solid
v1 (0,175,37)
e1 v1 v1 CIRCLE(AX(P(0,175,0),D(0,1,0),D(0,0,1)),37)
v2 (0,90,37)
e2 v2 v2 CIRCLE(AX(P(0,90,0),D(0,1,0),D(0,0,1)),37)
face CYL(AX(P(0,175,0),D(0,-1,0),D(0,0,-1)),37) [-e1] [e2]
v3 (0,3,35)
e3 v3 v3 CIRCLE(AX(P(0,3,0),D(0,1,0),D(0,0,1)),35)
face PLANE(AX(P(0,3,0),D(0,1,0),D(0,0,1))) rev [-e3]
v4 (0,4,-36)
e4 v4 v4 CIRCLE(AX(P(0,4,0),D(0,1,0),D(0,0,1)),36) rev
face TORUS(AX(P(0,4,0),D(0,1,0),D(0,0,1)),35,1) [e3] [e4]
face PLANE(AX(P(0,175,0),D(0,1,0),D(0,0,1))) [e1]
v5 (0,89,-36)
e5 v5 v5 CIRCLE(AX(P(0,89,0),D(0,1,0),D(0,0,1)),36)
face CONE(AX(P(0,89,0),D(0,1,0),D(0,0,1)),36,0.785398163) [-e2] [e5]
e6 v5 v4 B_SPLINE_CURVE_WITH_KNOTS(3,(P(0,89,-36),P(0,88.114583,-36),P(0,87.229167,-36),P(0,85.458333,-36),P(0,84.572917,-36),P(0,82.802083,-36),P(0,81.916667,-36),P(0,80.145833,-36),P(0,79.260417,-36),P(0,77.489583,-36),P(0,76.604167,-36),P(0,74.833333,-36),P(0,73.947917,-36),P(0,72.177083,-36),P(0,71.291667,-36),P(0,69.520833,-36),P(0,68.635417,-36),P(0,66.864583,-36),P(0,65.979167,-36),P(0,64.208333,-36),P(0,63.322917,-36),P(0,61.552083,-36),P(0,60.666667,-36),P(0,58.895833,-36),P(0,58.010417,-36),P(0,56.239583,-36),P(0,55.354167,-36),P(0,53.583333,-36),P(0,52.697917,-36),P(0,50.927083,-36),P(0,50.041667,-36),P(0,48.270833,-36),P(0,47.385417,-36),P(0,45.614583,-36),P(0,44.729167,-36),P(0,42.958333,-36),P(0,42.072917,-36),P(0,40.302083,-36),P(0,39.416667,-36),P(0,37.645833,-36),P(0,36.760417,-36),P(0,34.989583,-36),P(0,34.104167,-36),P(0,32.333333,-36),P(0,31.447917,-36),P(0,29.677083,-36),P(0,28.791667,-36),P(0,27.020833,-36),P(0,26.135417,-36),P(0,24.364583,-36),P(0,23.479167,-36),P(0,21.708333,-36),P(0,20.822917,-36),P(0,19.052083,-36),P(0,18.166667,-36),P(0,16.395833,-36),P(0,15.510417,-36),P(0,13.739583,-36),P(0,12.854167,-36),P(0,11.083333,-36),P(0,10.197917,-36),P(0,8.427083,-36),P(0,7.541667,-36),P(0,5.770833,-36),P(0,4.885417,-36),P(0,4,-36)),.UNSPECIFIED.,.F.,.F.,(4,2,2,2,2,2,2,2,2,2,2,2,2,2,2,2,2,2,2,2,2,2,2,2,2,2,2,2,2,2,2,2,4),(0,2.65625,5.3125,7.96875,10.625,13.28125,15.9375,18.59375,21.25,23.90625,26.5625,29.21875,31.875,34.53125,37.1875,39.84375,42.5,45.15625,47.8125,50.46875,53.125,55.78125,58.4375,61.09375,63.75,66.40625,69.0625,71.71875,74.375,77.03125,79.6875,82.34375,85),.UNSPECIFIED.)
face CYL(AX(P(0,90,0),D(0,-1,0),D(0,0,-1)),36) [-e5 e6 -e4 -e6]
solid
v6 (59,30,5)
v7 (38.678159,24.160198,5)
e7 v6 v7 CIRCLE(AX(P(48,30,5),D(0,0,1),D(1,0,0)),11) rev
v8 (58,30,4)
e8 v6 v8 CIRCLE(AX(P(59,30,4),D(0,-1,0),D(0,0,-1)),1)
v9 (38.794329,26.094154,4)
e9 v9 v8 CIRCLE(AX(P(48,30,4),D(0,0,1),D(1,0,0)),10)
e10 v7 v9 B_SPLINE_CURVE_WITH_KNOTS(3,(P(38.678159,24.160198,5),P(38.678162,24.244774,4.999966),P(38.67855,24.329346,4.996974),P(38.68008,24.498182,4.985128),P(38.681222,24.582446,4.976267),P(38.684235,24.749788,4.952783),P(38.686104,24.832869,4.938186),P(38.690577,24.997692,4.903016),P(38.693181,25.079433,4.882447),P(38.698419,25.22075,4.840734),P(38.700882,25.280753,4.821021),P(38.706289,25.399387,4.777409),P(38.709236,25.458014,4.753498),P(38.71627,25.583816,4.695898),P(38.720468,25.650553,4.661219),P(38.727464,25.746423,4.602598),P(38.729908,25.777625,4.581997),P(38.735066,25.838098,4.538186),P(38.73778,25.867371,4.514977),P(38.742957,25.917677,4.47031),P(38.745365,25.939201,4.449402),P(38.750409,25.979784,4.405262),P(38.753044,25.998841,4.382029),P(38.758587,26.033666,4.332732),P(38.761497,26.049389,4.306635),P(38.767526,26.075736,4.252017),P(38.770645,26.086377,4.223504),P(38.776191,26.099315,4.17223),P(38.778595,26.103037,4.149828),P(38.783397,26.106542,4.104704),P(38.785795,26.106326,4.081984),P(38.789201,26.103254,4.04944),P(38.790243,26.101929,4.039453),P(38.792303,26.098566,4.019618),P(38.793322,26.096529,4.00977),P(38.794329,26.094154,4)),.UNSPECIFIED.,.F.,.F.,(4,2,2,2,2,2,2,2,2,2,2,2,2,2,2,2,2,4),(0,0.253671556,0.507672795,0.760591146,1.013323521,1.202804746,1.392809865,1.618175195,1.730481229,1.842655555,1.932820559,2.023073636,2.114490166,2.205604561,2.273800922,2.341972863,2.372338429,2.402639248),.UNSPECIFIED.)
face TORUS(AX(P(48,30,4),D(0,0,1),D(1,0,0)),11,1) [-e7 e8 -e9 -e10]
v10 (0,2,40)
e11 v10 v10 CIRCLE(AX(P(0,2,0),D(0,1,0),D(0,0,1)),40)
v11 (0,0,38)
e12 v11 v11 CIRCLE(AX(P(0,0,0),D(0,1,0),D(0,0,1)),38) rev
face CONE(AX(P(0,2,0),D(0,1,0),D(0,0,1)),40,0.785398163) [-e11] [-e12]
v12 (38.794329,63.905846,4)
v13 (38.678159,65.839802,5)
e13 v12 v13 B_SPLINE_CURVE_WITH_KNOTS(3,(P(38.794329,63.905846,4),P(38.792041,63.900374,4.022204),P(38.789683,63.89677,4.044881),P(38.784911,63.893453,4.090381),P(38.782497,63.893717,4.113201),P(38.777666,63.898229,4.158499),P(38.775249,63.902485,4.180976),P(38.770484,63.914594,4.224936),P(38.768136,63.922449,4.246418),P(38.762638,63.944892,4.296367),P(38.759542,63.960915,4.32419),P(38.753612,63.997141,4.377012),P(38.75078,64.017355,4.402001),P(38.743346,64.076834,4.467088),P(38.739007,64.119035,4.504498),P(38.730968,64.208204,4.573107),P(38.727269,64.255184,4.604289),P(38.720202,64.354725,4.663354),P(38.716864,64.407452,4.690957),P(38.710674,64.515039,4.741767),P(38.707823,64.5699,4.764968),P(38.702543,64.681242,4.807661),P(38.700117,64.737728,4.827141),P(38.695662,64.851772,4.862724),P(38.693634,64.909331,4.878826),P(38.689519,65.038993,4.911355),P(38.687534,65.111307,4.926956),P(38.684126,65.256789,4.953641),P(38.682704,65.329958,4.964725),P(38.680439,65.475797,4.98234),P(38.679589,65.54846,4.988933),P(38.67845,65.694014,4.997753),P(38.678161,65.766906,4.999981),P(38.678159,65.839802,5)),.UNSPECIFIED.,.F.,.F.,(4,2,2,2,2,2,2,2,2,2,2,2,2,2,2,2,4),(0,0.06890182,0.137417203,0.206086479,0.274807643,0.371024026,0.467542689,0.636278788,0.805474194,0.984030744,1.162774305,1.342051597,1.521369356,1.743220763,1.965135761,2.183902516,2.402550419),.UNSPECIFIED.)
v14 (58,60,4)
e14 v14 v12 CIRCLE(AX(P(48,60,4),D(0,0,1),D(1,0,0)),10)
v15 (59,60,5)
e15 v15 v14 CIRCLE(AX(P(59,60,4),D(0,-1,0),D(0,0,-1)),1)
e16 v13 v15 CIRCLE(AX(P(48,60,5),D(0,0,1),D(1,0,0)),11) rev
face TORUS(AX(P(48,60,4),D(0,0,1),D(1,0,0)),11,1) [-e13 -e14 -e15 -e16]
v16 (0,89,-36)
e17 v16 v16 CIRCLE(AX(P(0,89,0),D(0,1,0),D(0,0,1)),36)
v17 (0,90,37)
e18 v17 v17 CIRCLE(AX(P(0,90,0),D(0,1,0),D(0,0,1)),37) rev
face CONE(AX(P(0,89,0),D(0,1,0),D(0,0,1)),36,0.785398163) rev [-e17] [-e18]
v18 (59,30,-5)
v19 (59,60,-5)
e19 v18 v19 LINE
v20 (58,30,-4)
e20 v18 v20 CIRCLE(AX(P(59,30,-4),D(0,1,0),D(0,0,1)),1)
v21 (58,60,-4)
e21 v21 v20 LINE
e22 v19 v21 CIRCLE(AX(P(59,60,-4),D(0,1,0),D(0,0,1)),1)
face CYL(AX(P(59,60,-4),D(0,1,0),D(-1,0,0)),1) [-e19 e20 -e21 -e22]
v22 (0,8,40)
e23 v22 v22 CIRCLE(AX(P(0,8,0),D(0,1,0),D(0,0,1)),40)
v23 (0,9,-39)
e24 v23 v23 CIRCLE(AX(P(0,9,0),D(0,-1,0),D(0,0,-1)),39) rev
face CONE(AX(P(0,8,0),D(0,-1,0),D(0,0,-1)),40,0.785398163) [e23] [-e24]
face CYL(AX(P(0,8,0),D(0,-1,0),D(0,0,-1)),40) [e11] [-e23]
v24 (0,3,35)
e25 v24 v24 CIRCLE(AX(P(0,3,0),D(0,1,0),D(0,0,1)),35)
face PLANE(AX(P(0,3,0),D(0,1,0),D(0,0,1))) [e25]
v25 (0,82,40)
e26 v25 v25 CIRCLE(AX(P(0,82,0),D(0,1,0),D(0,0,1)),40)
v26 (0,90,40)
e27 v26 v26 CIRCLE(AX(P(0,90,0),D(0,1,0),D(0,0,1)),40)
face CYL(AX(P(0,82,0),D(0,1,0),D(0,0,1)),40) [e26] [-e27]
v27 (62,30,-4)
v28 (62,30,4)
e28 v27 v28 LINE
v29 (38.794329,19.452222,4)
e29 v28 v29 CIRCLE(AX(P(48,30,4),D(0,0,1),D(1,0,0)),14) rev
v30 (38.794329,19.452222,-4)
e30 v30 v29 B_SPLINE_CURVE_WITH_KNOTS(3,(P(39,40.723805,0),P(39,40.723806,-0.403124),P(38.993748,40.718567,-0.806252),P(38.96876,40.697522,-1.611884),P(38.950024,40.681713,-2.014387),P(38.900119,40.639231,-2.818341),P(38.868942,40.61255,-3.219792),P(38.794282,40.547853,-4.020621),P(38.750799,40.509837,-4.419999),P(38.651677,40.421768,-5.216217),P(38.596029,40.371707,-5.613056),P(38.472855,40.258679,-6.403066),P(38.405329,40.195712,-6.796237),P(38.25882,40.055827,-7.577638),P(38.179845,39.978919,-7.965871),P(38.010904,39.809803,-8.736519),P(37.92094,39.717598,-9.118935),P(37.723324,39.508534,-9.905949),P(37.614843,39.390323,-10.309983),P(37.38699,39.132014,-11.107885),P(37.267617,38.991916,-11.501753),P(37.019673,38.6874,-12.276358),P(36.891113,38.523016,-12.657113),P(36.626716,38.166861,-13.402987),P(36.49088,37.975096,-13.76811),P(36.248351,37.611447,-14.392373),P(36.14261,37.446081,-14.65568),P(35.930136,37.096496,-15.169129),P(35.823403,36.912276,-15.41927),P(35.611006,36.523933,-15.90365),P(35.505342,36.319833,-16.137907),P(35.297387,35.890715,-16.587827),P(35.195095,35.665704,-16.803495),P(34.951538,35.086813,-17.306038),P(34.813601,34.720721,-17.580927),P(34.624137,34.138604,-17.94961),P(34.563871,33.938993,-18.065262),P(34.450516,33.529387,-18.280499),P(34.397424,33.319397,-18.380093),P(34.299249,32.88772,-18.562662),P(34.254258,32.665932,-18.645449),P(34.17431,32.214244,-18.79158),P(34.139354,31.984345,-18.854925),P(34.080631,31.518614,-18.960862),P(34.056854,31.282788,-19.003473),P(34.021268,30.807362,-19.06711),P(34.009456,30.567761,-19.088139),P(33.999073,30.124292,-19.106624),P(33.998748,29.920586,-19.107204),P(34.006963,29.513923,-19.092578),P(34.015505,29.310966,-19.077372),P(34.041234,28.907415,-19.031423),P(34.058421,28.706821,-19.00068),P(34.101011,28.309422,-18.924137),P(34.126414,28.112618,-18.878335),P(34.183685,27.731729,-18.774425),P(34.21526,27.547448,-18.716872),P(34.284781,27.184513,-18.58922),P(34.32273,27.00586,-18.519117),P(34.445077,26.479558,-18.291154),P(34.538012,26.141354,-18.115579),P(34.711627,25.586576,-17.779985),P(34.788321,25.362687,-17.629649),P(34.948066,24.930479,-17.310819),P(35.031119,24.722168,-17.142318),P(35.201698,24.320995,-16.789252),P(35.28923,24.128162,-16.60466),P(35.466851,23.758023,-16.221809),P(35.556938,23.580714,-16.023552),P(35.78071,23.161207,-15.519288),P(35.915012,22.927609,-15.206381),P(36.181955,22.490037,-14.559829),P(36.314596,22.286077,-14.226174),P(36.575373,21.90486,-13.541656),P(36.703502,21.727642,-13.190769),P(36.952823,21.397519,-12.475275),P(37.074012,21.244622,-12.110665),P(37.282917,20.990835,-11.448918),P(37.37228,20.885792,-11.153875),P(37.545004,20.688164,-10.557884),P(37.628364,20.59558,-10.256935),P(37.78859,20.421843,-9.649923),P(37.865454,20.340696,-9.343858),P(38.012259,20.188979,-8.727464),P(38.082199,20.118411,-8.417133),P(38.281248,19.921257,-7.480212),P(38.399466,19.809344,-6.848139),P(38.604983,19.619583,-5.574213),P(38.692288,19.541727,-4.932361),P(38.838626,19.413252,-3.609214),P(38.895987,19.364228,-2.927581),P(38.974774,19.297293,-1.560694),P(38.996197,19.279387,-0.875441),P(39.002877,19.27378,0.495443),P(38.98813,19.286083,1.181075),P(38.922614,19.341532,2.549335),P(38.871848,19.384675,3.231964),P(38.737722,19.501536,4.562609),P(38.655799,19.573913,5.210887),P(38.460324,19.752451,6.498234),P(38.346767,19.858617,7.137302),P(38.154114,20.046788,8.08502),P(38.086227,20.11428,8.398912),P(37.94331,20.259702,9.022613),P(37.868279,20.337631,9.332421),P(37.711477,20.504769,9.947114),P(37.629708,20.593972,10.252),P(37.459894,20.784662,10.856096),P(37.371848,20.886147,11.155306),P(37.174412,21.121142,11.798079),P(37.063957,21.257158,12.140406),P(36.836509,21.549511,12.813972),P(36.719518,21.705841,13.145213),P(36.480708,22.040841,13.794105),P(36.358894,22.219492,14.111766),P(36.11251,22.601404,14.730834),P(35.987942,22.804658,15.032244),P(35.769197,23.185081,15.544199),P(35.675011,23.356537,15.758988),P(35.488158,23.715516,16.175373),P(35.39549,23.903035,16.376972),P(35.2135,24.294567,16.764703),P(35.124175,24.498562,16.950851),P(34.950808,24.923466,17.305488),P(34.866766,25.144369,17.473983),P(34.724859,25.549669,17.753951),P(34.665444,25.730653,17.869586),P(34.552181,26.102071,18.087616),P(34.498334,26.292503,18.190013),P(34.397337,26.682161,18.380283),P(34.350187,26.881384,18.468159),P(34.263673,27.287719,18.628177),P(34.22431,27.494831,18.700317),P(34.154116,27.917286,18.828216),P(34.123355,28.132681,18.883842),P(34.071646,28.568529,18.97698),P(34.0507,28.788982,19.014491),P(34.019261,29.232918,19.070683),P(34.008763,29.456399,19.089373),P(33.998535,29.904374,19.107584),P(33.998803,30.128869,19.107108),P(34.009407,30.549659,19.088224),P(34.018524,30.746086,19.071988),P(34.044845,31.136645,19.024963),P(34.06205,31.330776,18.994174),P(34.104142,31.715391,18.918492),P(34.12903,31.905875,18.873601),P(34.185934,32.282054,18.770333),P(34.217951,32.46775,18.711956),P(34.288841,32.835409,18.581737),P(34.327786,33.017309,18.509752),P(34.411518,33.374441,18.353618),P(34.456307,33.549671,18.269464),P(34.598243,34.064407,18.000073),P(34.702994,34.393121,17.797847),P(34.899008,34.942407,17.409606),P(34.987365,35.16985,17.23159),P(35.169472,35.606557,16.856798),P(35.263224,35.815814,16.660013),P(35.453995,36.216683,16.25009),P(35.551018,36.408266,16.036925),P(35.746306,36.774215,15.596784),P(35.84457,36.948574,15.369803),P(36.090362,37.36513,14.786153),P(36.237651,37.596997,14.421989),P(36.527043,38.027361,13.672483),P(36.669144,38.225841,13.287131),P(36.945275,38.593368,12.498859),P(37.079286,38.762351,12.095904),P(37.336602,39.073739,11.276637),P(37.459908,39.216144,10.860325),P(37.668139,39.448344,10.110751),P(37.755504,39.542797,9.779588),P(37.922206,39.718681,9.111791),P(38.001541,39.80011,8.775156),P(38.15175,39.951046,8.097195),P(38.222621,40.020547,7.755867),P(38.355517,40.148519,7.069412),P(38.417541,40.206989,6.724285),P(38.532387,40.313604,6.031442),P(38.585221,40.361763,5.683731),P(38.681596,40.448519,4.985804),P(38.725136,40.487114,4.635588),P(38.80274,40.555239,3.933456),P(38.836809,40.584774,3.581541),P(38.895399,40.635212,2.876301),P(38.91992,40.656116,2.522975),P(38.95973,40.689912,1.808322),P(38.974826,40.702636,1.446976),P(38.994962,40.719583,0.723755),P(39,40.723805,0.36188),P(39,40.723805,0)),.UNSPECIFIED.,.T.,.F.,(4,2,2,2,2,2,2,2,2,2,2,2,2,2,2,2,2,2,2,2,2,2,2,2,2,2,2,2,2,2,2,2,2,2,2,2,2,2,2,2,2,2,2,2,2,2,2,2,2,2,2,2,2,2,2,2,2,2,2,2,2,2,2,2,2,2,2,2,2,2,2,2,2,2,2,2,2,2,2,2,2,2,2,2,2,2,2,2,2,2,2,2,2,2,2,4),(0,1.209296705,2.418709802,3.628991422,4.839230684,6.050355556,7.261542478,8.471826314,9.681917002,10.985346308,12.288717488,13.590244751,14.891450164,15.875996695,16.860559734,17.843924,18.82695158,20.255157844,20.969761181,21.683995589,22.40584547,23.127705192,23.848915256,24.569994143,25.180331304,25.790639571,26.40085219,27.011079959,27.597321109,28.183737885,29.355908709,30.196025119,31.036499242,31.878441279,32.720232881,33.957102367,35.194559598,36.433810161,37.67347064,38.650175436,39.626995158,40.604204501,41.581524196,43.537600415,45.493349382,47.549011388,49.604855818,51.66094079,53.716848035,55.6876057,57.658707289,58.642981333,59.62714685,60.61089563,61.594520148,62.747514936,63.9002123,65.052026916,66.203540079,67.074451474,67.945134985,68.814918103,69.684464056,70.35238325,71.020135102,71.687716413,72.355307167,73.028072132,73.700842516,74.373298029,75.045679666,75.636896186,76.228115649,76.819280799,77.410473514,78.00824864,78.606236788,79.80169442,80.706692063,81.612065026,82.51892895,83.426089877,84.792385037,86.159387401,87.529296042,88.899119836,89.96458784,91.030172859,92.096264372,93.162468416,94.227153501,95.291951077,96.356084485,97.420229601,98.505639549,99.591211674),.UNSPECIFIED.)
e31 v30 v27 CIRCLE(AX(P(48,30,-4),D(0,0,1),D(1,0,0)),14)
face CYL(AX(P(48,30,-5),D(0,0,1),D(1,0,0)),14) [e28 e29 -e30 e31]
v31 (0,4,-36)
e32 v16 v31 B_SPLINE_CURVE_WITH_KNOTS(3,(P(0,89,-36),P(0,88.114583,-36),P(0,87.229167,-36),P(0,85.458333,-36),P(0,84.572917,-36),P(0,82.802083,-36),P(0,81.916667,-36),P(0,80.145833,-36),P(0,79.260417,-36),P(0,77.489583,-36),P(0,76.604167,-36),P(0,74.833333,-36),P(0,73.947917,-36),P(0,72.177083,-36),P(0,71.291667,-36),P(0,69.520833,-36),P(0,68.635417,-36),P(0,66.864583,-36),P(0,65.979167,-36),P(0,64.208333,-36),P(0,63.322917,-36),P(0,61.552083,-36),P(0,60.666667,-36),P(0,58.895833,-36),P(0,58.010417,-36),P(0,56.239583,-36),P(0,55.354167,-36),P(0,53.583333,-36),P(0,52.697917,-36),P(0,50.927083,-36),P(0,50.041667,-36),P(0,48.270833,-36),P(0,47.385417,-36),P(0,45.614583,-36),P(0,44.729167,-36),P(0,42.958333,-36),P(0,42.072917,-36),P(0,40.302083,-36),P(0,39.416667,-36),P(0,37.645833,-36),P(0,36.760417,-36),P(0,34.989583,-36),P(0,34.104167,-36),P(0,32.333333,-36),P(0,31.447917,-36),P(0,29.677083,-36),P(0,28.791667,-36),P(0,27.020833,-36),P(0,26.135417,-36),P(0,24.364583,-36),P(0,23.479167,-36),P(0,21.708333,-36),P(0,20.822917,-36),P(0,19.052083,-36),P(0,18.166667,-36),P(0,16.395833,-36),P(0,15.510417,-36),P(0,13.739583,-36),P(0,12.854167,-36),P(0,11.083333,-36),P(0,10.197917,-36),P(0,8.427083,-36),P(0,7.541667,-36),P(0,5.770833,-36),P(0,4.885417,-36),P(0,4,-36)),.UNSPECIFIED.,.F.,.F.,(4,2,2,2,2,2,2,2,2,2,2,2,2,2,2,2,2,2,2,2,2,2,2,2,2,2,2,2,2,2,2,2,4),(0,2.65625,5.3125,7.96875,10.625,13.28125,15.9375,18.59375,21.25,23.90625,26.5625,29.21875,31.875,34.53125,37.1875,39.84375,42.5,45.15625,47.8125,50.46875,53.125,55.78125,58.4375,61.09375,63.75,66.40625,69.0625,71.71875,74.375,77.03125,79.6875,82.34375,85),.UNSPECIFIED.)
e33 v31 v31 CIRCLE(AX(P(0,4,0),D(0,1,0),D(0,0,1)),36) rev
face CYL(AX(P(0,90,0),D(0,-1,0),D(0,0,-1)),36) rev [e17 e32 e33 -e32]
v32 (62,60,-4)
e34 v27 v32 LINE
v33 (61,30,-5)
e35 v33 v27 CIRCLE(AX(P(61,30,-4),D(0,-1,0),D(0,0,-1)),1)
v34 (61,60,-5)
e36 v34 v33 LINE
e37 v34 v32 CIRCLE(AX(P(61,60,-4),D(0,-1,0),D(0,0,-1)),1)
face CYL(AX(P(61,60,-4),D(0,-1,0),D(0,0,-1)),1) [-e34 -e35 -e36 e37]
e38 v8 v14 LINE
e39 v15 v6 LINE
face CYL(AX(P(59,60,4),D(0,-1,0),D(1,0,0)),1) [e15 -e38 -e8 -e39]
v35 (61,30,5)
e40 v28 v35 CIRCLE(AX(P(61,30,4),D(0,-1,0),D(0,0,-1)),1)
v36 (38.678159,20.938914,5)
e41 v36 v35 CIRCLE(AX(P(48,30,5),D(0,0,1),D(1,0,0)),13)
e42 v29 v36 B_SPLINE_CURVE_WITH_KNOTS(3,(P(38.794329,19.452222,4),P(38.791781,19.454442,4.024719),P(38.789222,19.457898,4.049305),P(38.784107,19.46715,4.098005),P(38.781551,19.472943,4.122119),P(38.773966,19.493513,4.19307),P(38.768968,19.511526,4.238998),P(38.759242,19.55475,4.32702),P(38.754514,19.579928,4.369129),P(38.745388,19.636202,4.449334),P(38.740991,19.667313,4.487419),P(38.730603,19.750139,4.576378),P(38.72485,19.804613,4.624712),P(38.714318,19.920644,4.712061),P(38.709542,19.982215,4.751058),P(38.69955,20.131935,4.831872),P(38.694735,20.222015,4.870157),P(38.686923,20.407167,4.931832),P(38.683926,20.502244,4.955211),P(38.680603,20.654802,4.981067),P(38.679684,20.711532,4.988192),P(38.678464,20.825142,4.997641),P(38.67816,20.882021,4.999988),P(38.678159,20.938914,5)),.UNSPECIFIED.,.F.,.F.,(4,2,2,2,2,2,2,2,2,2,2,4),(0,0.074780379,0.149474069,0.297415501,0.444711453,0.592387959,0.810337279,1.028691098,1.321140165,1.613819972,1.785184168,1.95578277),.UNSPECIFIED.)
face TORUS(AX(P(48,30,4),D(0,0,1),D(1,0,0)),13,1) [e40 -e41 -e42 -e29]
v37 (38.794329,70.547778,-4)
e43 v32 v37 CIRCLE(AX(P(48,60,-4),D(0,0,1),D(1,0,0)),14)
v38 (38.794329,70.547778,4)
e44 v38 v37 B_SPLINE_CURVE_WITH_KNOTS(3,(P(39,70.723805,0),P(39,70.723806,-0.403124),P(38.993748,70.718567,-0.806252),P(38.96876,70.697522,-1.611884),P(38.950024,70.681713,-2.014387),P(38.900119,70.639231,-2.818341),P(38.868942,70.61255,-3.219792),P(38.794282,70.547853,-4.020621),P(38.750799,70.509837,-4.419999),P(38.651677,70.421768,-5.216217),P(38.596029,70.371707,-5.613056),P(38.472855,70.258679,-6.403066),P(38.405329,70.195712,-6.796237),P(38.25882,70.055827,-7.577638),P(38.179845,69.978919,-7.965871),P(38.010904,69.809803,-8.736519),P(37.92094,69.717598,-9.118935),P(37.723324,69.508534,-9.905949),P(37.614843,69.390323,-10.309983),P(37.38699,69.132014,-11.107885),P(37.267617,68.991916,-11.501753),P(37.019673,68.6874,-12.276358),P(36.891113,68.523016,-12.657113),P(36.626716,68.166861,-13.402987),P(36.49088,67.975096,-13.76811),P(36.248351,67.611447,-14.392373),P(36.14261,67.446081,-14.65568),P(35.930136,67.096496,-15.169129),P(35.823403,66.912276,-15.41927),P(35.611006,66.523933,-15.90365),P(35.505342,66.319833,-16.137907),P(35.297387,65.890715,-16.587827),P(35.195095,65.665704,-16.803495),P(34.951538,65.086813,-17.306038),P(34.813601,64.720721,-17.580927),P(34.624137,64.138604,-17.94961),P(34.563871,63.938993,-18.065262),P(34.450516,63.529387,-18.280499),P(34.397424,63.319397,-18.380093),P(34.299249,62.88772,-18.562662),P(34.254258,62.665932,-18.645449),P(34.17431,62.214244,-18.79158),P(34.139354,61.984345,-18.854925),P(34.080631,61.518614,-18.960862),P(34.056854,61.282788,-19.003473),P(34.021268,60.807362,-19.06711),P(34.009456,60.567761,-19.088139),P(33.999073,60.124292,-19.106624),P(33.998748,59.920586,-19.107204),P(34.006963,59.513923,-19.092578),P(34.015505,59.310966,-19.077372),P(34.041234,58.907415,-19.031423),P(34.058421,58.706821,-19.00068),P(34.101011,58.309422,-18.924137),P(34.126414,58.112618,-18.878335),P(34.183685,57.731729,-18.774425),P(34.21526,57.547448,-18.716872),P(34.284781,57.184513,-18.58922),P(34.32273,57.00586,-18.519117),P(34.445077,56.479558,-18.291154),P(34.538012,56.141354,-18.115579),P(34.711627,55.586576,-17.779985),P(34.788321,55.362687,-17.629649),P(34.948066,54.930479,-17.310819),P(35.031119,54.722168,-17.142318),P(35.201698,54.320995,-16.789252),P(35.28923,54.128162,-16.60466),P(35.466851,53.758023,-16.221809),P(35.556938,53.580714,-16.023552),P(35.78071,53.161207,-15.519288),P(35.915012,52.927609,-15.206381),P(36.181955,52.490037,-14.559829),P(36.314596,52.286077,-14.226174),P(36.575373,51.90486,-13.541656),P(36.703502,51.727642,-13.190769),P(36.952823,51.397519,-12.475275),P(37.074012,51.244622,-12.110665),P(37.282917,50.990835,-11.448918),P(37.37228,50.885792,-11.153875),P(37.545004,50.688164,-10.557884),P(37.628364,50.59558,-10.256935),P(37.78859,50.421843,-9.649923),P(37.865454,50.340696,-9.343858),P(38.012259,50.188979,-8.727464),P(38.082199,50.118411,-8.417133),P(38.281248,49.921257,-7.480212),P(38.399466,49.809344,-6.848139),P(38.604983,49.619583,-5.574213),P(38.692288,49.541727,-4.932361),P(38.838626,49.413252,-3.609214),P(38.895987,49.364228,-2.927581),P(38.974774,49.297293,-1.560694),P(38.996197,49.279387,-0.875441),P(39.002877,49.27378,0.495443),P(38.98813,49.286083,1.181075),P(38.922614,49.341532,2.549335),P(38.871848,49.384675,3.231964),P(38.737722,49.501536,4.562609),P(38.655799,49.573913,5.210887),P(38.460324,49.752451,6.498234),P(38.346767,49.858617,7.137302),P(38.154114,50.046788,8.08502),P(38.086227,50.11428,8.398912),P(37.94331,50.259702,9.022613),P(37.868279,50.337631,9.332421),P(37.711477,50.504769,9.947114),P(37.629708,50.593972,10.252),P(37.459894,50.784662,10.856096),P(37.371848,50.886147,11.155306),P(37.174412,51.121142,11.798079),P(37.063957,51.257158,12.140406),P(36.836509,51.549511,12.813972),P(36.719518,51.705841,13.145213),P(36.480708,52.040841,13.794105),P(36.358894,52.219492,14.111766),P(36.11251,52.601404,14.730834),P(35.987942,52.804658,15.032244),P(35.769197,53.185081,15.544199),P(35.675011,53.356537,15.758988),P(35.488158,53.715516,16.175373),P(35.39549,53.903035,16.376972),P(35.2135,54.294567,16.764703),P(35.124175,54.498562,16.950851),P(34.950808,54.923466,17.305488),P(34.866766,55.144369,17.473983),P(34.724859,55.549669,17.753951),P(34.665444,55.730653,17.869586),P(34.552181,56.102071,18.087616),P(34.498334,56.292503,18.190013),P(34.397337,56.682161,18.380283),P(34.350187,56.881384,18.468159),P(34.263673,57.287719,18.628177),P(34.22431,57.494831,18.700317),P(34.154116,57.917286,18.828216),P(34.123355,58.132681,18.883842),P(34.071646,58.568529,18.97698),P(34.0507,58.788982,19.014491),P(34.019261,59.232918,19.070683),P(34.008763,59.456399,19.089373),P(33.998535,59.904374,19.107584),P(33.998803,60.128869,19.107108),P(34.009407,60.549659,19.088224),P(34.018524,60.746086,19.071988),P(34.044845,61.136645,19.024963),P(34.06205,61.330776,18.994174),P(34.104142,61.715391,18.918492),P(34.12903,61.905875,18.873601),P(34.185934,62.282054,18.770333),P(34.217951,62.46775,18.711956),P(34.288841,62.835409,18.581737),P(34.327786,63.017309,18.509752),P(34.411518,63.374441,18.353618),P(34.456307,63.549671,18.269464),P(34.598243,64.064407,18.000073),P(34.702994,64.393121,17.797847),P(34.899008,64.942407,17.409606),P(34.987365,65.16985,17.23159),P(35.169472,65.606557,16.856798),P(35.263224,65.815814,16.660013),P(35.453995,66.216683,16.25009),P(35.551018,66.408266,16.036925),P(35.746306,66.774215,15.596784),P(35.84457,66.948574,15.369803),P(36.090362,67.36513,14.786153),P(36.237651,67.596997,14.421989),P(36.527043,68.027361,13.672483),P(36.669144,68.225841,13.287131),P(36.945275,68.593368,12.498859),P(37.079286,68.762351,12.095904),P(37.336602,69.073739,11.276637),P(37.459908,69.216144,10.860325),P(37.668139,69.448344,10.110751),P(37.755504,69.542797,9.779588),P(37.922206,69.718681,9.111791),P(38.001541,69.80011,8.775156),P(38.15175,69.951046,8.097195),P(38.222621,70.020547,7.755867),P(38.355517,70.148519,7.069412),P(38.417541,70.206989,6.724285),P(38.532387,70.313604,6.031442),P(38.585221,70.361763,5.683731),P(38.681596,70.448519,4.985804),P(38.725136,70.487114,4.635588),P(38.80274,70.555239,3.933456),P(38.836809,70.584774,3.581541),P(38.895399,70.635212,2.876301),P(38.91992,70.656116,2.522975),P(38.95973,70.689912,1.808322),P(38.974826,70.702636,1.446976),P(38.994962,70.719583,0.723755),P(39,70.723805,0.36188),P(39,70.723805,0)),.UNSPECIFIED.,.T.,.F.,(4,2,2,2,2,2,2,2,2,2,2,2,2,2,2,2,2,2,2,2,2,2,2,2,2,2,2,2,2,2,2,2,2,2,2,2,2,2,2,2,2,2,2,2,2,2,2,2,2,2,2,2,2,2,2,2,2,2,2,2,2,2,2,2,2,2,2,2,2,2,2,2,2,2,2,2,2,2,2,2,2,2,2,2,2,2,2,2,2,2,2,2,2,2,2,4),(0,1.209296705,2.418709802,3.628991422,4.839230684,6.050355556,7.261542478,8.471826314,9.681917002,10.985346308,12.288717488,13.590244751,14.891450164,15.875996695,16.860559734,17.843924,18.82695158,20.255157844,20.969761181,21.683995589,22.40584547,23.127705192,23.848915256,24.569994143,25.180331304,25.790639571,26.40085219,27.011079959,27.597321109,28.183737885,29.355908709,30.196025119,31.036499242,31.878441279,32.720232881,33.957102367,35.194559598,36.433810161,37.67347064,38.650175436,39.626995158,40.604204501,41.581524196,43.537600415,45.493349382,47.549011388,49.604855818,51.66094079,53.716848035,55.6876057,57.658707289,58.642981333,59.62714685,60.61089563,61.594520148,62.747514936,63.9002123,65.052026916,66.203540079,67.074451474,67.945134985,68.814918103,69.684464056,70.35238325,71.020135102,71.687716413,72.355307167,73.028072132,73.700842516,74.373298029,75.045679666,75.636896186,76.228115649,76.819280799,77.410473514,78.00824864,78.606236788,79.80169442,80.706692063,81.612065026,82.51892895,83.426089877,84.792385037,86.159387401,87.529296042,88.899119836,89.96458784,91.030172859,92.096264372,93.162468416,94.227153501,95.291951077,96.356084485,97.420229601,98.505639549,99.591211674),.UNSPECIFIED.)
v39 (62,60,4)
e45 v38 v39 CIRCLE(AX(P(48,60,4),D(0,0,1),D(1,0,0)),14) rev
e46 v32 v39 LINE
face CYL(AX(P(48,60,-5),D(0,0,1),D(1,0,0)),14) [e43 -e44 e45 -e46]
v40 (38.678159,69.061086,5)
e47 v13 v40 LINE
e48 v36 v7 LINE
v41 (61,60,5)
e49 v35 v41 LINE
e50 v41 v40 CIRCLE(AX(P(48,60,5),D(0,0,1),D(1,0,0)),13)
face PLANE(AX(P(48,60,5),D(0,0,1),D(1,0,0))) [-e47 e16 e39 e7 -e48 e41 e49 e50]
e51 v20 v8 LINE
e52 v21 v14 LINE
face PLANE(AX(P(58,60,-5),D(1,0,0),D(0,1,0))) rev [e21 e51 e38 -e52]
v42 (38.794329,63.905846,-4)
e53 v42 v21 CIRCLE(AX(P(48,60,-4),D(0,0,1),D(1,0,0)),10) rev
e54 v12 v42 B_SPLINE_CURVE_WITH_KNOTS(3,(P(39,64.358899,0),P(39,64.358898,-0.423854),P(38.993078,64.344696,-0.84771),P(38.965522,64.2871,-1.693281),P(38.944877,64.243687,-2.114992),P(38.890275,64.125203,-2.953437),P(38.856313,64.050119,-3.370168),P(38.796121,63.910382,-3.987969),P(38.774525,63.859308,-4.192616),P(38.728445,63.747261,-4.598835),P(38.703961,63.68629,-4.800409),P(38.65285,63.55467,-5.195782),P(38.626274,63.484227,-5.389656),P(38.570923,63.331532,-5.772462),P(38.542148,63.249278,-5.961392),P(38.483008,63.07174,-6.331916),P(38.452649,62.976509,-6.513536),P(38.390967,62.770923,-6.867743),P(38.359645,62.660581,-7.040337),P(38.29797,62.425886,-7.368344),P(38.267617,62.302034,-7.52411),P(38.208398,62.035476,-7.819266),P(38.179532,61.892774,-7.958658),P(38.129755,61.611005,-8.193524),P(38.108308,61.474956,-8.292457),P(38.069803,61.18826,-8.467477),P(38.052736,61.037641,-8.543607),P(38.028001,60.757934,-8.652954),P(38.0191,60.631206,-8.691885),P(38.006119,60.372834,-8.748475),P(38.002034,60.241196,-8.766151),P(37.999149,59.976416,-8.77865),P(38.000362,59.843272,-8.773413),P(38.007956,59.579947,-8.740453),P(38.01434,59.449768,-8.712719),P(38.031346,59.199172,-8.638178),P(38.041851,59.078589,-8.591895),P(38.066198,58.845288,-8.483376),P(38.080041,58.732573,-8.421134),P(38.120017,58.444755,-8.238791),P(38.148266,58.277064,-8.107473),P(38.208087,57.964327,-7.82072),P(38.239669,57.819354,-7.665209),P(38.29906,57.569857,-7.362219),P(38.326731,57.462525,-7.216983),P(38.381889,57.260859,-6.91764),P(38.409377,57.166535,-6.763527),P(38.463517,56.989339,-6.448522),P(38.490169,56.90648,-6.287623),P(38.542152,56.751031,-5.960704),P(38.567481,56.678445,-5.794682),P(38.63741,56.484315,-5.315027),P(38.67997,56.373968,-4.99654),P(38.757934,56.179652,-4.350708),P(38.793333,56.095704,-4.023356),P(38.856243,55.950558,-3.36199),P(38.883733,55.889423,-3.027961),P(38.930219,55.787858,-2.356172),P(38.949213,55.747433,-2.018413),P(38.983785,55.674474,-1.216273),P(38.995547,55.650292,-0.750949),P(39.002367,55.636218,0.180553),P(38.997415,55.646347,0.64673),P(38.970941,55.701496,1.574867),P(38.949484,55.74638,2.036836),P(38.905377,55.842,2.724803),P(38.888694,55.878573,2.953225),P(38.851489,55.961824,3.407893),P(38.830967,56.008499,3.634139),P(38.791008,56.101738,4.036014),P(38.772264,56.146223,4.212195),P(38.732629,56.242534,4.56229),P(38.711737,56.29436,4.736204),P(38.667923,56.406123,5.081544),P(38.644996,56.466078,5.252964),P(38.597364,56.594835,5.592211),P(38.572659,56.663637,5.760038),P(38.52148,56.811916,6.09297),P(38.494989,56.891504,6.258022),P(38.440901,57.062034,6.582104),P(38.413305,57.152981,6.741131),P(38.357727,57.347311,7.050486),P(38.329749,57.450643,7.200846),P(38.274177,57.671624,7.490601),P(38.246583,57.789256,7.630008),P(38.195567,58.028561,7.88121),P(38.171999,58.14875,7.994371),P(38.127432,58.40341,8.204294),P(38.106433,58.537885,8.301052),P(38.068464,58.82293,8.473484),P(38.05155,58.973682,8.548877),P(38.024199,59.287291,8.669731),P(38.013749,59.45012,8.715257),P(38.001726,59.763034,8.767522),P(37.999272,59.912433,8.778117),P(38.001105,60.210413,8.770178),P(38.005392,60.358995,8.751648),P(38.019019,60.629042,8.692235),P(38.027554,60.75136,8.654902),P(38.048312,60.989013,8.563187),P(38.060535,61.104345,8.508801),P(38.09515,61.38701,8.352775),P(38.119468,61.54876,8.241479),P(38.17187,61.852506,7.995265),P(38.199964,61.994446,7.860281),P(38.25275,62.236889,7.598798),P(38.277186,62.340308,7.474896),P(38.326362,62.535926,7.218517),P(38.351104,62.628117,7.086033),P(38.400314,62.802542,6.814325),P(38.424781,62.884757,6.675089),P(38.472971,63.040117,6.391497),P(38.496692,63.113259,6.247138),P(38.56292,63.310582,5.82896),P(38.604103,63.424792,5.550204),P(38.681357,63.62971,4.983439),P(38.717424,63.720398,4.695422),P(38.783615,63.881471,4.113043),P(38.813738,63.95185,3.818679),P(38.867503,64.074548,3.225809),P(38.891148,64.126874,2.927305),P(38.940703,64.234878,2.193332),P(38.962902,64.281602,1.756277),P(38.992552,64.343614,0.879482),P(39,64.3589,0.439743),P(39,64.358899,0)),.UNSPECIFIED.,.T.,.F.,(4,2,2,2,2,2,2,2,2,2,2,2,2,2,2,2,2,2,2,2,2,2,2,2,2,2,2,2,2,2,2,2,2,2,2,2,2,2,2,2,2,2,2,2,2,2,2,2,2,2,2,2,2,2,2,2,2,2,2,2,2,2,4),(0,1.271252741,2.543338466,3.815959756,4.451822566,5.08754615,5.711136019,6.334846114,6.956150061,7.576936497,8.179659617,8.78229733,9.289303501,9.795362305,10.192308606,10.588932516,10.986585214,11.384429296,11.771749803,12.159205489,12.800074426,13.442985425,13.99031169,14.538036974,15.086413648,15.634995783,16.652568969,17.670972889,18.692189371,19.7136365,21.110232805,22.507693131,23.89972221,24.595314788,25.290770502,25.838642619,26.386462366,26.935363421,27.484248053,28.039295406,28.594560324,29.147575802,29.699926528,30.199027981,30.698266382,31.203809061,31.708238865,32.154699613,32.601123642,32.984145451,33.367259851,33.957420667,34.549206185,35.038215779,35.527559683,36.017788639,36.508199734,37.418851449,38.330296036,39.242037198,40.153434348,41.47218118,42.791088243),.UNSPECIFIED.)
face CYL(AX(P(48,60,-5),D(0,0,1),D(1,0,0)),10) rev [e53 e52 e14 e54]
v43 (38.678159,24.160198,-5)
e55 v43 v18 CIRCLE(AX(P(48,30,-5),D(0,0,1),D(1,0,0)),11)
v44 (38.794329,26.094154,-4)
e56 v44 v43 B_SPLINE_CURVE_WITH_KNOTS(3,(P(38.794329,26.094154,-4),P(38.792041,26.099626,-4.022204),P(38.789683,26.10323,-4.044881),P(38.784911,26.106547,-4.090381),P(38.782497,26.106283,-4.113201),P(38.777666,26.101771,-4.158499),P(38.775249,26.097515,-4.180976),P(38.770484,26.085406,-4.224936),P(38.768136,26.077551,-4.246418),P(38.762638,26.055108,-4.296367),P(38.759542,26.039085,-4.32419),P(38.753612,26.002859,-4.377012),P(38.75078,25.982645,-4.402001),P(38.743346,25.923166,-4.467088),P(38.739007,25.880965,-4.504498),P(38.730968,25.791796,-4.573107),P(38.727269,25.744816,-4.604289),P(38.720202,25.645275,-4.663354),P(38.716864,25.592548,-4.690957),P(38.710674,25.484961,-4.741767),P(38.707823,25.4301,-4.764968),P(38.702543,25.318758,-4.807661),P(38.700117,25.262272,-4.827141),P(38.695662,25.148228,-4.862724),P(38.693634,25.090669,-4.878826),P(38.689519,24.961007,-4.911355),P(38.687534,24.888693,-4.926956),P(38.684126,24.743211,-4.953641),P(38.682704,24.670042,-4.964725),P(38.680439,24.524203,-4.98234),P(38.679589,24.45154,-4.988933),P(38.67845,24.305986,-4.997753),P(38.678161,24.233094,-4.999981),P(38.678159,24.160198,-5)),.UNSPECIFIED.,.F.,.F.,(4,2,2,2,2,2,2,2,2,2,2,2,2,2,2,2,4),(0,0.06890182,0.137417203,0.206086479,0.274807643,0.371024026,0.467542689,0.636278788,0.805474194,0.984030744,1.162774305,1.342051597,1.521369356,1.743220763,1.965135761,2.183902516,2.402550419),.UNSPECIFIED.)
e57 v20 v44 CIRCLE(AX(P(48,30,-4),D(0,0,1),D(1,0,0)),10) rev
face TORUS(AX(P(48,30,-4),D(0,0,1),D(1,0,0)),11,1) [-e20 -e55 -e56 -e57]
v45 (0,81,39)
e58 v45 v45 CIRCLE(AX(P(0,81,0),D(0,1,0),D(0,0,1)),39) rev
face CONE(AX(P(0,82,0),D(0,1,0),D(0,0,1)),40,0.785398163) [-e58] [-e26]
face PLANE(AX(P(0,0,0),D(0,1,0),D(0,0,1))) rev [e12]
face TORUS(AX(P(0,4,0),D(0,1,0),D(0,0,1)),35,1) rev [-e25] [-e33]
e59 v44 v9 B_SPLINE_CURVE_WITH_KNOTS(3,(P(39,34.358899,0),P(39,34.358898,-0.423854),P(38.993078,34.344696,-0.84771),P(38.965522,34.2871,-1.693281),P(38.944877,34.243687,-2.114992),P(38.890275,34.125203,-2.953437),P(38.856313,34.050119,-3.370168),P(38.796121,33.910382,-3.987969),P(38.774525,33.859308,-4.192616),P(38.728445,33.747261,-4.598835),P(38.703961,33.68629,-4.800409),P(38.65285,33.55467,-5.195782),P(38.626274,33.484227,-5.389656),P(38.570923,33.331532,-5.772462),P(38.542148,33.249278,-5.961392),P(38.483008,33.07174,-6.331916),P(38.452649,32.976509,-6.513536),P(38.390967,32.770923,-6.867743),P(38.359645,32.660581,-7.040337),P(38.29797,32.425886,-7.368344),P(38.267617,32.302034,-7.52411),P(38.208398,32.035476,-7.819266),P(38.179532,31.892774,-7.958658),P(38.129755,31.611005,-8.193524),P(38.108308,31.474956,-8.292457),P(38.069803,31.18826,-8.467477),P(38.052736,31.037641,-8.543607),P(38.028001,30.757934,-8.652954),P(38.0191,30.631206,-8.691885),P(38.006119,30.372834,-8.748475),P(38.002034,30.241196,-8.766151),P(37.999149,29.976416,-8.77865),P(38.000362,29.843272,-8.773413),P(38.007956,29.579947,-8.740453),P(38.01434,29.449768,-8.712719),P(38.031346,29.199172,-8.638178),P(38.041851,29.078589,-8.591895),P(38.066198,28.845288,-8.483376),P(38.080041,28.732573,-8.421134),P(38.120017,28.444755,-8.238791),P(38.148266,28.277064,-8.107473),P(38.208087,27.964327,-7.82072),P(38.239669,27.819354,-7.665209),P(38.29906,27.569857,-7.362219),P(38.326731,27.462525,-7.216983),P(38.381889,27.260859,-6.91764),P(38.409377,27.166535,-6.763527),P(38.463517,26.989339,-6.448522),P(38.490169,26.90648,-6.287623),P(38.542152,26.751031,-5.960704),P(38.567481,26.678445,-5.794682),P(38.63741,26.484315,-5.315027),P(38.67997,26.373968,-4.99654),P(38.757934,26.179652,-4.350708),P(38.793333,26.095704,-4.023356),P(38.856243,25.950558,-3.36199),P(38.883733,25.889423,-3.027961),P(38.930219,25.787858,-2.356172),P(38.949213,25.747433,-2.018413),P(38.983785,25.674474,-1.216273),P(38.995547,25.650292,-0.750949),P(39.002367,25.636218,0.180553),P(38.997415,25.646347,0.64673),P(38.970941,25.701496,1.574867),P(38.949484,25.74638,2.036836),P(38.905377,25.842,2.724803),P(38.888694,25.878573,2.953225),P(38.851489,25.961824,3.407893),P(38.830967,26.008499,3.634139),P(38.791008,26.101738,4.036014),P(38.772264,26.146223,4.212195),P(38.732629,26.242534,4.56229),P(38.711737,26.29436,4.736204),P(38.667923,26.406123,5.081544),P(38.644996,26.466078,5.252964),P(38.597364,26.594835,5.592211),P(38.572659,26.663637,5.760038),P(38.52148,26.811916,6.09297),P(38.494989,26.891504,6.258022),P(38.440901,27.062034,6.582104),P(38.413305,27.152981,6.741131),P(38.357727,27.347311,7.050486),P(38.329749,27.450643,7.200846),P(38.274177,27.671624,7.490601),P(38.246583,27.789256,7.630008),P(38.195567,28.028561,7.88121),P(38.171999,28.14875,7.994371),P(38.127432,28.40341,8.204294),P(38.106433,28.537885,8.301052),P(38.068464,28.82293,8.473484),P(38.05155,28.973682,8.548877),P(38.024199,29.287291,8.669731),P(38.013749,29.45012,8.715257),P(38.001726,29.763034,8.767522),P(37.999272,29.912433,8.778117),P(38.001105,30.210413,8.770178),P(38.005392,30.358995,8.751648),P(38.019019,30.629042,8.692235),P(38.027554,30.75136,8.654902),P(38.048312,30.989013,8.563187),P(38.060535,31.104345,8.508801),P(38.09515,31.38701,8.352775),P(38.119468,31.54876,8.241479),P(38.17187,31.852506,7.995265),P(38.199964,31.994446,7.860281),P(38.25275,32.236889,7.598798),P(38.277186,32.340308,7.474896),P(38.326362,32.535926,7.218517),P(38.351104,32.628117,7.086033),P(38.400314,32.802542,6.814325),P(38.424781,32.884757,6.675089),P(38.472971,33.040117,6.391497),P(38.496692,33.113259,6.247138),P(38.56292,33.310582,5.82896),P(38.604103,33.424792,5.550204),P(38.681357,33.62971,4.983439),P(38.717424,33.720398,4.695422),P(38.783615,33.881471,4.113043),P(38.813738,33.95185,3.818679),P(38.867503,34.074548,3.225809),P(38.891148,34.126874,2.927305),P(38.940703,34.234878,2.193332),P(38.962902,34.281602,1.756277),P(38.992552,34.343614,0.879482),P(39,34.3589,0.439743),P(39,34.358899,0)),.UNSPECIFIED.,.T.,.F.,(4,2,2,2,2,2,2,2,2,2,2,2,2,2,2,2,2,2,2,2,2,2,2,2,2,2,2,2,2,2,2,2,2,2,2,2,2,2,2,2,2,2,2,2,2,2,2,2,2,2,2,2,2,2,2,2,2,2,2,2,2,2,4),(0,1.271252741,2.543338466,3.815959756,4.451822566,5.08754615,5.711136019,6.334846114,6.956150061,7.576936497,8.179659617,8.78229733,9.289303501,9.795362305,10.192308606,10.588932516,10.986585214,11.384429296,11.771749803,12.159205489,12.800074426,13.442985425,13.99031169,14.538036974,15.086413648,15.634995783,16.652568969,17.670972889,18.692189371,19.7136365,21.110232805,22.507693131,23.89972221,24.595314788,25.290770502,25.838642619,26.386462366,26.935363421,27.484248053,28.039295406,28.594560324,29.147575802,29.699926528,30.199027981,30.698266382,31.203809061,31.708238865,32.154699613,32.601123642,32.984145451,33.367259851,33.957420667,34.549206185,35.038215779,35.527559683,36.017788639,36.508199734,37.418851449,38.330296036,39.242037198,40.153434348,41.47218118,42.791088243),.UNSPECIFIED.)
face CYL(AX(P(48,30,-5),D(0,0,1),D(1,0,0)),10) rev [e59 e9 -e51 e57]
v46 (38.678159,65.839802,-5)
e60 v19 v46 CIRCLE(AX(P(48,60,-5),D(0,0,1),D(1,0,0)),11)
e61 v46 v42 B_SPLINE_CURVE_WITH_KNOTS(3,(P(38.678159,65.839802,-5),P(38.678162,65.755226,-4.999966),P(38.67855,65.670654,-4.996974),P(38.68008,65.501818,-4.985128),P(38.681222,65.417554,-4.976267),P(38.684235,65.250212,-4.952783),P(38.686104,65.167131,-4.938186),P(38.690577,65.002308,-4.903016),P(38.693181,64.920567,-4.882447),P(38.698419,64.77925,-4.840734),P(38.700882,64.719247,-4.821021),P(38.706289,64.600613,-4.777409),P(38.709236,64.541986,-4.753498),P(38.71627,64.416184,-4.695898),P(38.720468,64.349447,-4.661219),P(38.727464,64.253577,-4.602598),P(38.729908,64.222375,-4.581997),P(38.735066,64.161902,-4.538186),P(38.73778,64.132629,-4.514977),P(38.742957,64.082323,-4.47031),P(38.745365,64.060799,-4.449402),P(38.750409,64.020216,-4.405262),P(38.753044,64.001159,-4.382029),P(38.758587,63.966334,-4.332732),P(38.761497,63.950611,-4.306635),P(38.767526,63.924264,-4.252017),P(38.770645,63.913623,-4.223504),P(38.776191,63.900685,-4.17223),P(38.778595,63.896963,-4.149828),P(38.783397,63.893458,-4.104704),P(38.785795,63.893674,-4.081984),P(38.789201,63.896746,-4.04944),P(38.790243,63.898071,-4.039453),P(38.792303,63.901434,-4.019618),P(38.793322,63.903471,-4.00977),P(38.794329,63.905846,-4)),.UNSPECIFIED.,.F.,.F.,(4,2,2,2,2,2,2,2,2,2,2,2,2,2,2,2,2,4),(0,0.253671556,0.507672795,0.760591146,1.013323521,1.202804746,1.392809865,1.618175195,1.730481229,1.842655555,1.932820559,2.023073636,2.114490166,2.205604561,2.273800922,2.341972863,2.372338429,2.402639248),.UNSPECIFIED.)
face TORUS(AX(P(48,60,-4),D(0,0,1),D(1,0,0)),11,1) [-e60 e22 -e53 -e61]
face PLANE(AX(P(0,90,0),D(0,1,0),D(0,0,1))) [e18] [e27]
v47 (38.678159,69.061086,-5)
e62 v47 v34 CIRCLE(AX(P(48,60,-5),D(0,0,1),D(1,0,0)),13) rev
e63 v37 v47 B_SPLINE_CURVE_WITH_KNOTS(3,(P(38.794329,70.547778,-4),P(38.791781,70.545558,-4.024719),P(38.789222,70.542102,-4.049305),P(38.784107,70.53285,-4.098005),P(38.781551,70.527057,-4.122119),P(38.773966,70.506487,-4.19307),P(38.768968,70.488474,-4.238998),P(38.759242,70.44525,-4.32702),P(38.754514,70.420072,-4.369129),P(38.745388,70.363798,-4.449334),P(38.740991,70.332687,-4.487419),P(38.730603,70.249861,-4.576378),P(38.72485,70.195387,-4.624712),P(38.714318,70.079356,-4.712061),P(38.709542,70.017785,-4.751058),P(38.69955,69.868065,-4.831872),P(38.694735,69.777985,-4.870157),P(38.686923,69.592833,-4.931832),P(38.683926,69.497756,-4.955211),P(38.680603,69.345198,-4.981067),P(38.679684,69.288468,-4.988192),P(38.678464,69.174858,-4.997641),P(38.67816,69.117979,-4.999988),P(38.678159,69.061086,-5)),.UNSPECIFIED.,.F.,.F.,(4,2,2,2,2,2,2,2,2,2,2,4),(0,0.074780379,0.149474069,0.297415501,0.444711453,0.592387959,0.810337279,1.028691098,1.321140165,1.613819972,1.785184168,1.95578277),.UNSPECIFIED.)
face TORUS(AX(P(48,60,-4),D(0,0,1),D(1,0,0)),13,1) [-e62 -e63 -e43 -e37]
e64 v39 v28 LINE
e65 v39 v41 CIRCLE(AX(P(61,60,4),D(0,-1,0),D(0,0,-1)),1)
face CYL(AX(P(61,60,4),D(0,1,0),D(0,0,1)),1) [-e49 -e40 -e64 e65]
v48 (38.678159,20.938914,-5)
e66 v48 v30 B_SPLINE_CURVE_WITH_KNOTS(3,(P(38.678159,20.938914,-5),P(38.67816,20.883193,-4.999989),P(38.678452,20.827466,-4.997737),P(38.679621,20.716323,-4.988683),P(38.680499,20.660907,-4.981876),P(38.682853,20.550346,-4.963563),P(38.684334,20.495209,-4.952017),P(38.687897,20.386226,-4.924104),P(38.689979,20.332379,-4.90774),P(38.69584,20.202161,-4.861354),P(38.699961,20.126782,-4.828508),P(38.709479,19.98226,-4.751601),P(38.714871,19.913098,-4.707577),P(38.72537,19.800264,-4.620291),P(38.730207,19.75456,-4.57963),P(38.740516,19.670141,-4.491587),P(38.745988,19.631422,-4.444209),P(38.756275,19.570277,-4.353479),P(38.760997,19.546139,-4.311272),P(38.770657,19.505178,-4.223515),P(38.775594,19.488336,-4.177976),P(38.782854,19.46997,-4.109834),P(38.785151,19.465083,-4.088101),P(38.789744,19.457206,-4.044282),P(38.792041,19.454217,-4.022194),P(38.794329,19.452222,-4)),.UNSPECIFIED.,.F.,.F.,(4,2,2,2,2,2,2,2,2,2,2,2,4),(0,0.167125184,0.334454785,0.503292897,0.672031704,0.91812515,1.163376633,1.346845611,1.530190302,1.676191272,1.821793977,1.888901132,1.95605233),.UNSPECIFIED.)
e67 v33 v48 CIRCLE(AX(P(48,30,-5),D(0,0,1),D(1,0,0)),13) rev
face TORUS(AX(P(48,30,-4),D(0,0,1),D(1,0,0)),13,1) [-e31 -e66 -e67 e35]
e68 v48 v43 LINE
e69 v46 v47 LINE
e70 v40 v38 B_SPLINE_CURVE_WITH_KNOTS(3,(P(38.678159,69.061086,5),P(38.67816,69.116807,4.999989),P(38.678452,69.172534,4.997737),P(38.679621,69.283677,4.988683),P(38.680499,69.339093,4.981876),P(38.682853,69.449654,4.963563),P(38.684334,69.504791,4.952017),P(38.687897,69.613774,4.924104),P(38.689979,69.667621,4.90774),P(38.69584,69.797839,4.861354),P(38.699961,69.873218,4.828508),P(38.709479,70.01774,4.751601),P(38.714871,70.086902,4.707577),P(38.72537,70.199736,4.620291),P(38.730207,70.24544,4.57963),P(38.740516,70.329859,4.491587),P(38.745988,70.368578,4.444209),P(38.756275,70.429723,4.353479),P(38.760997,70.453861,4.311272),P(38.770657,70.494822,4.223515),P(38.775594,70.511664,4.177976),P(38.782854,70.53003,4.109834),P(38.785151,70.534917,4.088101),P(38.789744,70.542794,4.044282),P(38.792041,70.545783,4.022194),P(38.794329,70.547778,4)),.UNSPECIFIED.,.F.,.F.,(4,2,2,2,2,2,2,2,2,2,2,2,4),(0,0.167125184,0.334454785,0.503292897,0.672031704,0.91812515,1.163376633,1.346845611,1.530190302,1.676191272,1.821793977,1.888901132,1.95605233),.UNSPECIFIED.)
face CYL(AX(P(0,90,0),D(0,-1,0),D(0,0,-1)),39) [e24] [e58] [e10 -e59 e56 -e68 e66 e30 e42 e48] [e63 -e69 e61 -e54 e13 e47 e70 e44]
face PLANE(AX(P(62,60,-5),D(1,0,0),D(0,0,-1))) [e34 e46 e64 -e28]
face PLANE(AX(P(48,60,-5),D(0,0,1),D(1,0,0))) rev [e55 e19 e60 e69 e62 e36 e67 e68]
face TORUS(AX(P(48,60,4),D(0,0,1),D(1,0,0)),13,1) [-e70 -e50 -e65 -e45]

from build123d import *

# Parameters (mm, degrees)
SKETCH1_R               = 39
BOSS_EXTRUDE1_DEPTH     = 90
SHELL3_T                = -3
BOSS_EXTRUDE3_START     = -8
SKETCH6_R               = 40
SKETCH6_R_2             = 39
BOSS_EXTRUDE3_DEPTH     = 8
CHAMFER2_SIZE           = 2
CHAMFER3_SIZE           = 1
CHAMFER4_SIZE           = 1
BOSS_EXTRUDE8_START     = 30
BOSS_EXTRUDE8_OUTLINE_W = 4
BOSS_EXTRUDE8_OUTLINE_H = 10
BOSS_EXTRUDE8_DEPTH     = 29.9999999
BOSS_EXTRUDE8_START_2   = -5
BOSS_EXTRUDE8_2_DEPTH   = 10
CUT_EXTRUDE3_START      = -70
SKETCH11_R              = 36
CUT_EXTRUDE3_DEPTH      = 70
FILLET4_R               = 1
FILLET5_R               = 1
CHAMFER5_SIZE           = 1
SKETCH12_R              = 37
BOSS_EXTRUDE9_DEPTH     = 85
SKETCH13_R              = 45
BOSS_EXTRUDE10_DEPTH    = 10
SKETCH14_R              = 61.590607199
SKETCH14_R_2            = 37
CUT_EXTRUDE4_DEPTH      = 25


with BuildPart() as part:
    # Sketch1 → Boss-Extrude1 (new body)
    with BuildSketch(Plane(origin=(0, 0, 0), x_dir=(1, 0, 0), z_dir=(0, 1, 0))):
        with Locations(Location((0, 0, 0), (0, 0, 90))):
            Circle(SKETCH1_R)
    extrude(amount=BOSS_EXTRUDE1_DEPTH)

    # Shell3
    shell3_openings = [part.faces().sort_by_distance(p)[0] for p in [
        (0, 90, 0),
    ]]
    offset(amount=SHELL3_T, openings=shell3_openings, kind=Kind.INTERSECTION)

    # Sketch6 → Boss-Extrude3 (add)
    with BuildSketch(Plane(origin=(0, 90, 0), x_dir=(1, 0, 0), z_dir=(0, 1, 0)).offset(BOSS_EXTRUDE3_START)):
        with Locations(Location((0, 0, 0), (0, 0, 270))):
            Circle(SKETCH6_R)
        with Locations(Location((0, 0, 0), (0, 0, 90))):
            Circle(SKETCH6_R_2, mode=Mode.SUBTRACT)
    boss_extrude3 = extrude(amount=BOSS_EXTRUDE3_DEPTH)

    # Mirror1: Boss-Extrude3 across plane
    add(boss_extrude3.mirror(Plane.ZX.offset(45)))

    # Chamfer2
    chamfer2_edges = [part.edges().sort_by_distance(p)[0] for p in [
        (0, 0, -40),
    ]]
    chamfer(chamfer2_edges, length=CHAMFER2_SIZE)

    # Chamfer3
    chamfer3_edges = [part.edges().sort_by_distance(p)[0] for p in [
        (0, 8, 39),
    ]]
    chamfer(chamfer3_edges, length=CHAMFER3_SIZE - 0.0001)  # a hair under: the kernel refuses the full size

    # Chamfer4
    chamfer4_edges = [part.edges().sort_by_distance(p)[0] for p in [
        (0, 82, 39),
    ]]
    chamfer(chamfer4_edges, length=CHAMFER4_SIZE - 0.0001)  # a hair under: the kernel refuses the full size

    # Boss-Extrude8: read off the stored shape, not the designer's step
    # Boss-Extrude8 outline → Boss-Extrude8 (add)
    with BuildSketch(Plane(origin=(0, 0, 0), x_dir=(1, 0, 0), z_dir=(0, 1, 0)).offset(BOSS_EXTRUDE8_START)):
        with BuildLine():
            Line((35.65108694, 5), (34, 5))
            Line((34, 5), (34, -5))
            Line((34, -5), (35.65108694, -5))
            ThreePointArc((35.65108694, -5), (36, 0), (35.65108694, 5))
        make_face()
        with Locations((60, 0)):
            Rectangle(BOSS_EXTRUDE8_OUTLINE_W, BOSS_EXTRUDE8_OUTLINE_H)
    extrude(amount=BOSS_EXTRUDE8_DEPTH)

    # Boss-Extrude8 2 outline → Boss-Extrude8 2 (add)
    with BuildSketch(Plane.XY.offset(BOSS_EXTRUDE8_START_2)):
        with BuildLine():
            Line((37.272505048, 30), (34, 30))
            ThreePointArc((34, 30), (34.509326065, 26.258113205), (36.000245256, 22.788489335))
            Line((36.000245256, 22.788489335), (37.093979465, 20.968545795))
            Line((37.093979465, 20.968545795), (38.678159212, 19.554748241))
            ThreePointArc((38.678159212, 19.554748241), (53.722509457, 17.222954742), (62, 30))
            Line((62, 30), (58, 30))
            ThreePointArc((58, 30), (49.841411431, 20.171001885), (38.678159212, 26.380154103))
            Line((38.678159212, 26.380154103), (37.272505048, 30))
        make_face()
        with BuildLine():
            Line((34, 60), (37.27250501, 59.9999999))
            Line((37.27250501, 59.9999999), (38.678159212, 63.619845897))
            ThreePointArc((38.678159212, 63.619845897), (49.841411431, 69.828998115), (58, 60))
            Line((58, 60), (62, 60))
            ThreePointArc((62, 60), (53.722509457, 72.777045258), (38.678159212, 70.445251759))
            Line((38.678159212, 70.445251759), (37.094524497, 69.031940618))
            Line((37.094524497, 69.031940618), (36.000980999, 67.212734781))
            ThreePointArc((36.000980999, 67.212734781), (34.509516947, 63.742574915), (34, 60))
        make_face()
    extrude(amount=BOSS_EXTRUDE8_2_DEPTH)

    # Sketch11 → Cut-Extrude3 (cut)
    with BuildSketch(Plane(origin=(0, 90, 0), x_dir=(1, 0, 0), z_dir=(0, 1, 0)).offset(CUT_EXTRUDE3_START)):
        with Locations(Location((0, 0, 0), (0, 0, 90))):
            Circle(SKETCH11_R)
    extrude(amount=CUT_EXTRUDE3_DEPTH, mode=Mode.SUBTRACT)

    # Fillet4
    fillet4_edges = [part.edges().sort_by_distance(p)[0] for p in [
        (49.841411431, 69.828998115, -5),
        (58, 44.99999995, -5),
        (53.722509457, 17.222954742, -5),
        (53.722509457, 72.777045258, -5),
        (49.841411431, 20.171001885, 5),
        (49.841411431, 69.828998115, 5),
        (53.722509457, 17.222954742, 5),
        (53.722509457, 72.777045258, 5),
        (49.841411431, 20.171001885, -5),
        (62, 44.99999995, -5),
        (58, 44.99999995, 5),
        (62, 44.99999995, 5),
    ]]
    fillet(fillet4_edges, radius=FILLET4_R)

    # Fillet5
    fillet5_edges = [part.edges().sort_by_distance(p)[0] for p in [
        (0, 3, 36),
    ]]
    fillet(fillet5_edges, radius=FILLET5_R)

    # Chamfer5
    chamfer5_edges = [part.edges().sort_by_distance(p)[0] for p in [
        (0, 90, 36),
    ]]
    chamfer(chamfer5_edges, length=CHAMFER5_SIZE)


with BuildPart() as body_2:
    # Surface-Knit1: read off the stored shape, not the designer's step
    # Surface-Knit1 outline → Surface-Knit1 (revolve)
    with BuildSketch(Plane.XY):
        with BuildLine():
            Line((0, 90), (0, 3))
            Line((0, 3), (35, 3))
            ThreePointArc((35, 3), (35.707106781, 3.292893219), (36, 4))
            Line((36, 4), (36, 89))
            Line((36, 89), (37, 90))
            Line((37, 90), (0, 90))
        make_face()
    revolve(axis=Axis((0, 0, 0), (0, 1, 0)))

    # Sketch12 → Boss-Extrude9 (add)
    with BuildSketch(Plane(origin=(0, 90, 0), x_dir=(1, 0, 0), z_dir=(0, 1, 0))):
        with Locations(Location((0, 0, 0), (0, 0, 270))):
            Circle(SKETCH12_R)
    extrude(amount=BOSS_EXTRUDE9_DEPTH)

    # Sketch13 → Boss-Extrude10 (add)
    with BuildSketch(Plane(origin=(0, 175, 0), x_dir=(1, 0, 0), z_dir=(0, 1, 0))):
        with Locations(Location((0, 0, 0), (0, 0, 270))):
            Circle(SKETCH13_R)
    extrude(amount=-BOSS_EXTRUDE10_DEPTH)

    # Sketch14 → Cut-Extrude4 (cut)
    with BuildSketch(Plane.XZ.offset(-165)):
        Circle(SKETCH14_R)
        with Locations(Location((0, 0, 0), (0, 0, 90))):
            Circle(SKETCH14_R_2, mode=Mode.SUBTRACT)
    extrude(amount=-CUT_EXTRUDE4_DEPTH, mode=Mode.SUBTRACT)


solid = Compound([part.part, body_2.part])
